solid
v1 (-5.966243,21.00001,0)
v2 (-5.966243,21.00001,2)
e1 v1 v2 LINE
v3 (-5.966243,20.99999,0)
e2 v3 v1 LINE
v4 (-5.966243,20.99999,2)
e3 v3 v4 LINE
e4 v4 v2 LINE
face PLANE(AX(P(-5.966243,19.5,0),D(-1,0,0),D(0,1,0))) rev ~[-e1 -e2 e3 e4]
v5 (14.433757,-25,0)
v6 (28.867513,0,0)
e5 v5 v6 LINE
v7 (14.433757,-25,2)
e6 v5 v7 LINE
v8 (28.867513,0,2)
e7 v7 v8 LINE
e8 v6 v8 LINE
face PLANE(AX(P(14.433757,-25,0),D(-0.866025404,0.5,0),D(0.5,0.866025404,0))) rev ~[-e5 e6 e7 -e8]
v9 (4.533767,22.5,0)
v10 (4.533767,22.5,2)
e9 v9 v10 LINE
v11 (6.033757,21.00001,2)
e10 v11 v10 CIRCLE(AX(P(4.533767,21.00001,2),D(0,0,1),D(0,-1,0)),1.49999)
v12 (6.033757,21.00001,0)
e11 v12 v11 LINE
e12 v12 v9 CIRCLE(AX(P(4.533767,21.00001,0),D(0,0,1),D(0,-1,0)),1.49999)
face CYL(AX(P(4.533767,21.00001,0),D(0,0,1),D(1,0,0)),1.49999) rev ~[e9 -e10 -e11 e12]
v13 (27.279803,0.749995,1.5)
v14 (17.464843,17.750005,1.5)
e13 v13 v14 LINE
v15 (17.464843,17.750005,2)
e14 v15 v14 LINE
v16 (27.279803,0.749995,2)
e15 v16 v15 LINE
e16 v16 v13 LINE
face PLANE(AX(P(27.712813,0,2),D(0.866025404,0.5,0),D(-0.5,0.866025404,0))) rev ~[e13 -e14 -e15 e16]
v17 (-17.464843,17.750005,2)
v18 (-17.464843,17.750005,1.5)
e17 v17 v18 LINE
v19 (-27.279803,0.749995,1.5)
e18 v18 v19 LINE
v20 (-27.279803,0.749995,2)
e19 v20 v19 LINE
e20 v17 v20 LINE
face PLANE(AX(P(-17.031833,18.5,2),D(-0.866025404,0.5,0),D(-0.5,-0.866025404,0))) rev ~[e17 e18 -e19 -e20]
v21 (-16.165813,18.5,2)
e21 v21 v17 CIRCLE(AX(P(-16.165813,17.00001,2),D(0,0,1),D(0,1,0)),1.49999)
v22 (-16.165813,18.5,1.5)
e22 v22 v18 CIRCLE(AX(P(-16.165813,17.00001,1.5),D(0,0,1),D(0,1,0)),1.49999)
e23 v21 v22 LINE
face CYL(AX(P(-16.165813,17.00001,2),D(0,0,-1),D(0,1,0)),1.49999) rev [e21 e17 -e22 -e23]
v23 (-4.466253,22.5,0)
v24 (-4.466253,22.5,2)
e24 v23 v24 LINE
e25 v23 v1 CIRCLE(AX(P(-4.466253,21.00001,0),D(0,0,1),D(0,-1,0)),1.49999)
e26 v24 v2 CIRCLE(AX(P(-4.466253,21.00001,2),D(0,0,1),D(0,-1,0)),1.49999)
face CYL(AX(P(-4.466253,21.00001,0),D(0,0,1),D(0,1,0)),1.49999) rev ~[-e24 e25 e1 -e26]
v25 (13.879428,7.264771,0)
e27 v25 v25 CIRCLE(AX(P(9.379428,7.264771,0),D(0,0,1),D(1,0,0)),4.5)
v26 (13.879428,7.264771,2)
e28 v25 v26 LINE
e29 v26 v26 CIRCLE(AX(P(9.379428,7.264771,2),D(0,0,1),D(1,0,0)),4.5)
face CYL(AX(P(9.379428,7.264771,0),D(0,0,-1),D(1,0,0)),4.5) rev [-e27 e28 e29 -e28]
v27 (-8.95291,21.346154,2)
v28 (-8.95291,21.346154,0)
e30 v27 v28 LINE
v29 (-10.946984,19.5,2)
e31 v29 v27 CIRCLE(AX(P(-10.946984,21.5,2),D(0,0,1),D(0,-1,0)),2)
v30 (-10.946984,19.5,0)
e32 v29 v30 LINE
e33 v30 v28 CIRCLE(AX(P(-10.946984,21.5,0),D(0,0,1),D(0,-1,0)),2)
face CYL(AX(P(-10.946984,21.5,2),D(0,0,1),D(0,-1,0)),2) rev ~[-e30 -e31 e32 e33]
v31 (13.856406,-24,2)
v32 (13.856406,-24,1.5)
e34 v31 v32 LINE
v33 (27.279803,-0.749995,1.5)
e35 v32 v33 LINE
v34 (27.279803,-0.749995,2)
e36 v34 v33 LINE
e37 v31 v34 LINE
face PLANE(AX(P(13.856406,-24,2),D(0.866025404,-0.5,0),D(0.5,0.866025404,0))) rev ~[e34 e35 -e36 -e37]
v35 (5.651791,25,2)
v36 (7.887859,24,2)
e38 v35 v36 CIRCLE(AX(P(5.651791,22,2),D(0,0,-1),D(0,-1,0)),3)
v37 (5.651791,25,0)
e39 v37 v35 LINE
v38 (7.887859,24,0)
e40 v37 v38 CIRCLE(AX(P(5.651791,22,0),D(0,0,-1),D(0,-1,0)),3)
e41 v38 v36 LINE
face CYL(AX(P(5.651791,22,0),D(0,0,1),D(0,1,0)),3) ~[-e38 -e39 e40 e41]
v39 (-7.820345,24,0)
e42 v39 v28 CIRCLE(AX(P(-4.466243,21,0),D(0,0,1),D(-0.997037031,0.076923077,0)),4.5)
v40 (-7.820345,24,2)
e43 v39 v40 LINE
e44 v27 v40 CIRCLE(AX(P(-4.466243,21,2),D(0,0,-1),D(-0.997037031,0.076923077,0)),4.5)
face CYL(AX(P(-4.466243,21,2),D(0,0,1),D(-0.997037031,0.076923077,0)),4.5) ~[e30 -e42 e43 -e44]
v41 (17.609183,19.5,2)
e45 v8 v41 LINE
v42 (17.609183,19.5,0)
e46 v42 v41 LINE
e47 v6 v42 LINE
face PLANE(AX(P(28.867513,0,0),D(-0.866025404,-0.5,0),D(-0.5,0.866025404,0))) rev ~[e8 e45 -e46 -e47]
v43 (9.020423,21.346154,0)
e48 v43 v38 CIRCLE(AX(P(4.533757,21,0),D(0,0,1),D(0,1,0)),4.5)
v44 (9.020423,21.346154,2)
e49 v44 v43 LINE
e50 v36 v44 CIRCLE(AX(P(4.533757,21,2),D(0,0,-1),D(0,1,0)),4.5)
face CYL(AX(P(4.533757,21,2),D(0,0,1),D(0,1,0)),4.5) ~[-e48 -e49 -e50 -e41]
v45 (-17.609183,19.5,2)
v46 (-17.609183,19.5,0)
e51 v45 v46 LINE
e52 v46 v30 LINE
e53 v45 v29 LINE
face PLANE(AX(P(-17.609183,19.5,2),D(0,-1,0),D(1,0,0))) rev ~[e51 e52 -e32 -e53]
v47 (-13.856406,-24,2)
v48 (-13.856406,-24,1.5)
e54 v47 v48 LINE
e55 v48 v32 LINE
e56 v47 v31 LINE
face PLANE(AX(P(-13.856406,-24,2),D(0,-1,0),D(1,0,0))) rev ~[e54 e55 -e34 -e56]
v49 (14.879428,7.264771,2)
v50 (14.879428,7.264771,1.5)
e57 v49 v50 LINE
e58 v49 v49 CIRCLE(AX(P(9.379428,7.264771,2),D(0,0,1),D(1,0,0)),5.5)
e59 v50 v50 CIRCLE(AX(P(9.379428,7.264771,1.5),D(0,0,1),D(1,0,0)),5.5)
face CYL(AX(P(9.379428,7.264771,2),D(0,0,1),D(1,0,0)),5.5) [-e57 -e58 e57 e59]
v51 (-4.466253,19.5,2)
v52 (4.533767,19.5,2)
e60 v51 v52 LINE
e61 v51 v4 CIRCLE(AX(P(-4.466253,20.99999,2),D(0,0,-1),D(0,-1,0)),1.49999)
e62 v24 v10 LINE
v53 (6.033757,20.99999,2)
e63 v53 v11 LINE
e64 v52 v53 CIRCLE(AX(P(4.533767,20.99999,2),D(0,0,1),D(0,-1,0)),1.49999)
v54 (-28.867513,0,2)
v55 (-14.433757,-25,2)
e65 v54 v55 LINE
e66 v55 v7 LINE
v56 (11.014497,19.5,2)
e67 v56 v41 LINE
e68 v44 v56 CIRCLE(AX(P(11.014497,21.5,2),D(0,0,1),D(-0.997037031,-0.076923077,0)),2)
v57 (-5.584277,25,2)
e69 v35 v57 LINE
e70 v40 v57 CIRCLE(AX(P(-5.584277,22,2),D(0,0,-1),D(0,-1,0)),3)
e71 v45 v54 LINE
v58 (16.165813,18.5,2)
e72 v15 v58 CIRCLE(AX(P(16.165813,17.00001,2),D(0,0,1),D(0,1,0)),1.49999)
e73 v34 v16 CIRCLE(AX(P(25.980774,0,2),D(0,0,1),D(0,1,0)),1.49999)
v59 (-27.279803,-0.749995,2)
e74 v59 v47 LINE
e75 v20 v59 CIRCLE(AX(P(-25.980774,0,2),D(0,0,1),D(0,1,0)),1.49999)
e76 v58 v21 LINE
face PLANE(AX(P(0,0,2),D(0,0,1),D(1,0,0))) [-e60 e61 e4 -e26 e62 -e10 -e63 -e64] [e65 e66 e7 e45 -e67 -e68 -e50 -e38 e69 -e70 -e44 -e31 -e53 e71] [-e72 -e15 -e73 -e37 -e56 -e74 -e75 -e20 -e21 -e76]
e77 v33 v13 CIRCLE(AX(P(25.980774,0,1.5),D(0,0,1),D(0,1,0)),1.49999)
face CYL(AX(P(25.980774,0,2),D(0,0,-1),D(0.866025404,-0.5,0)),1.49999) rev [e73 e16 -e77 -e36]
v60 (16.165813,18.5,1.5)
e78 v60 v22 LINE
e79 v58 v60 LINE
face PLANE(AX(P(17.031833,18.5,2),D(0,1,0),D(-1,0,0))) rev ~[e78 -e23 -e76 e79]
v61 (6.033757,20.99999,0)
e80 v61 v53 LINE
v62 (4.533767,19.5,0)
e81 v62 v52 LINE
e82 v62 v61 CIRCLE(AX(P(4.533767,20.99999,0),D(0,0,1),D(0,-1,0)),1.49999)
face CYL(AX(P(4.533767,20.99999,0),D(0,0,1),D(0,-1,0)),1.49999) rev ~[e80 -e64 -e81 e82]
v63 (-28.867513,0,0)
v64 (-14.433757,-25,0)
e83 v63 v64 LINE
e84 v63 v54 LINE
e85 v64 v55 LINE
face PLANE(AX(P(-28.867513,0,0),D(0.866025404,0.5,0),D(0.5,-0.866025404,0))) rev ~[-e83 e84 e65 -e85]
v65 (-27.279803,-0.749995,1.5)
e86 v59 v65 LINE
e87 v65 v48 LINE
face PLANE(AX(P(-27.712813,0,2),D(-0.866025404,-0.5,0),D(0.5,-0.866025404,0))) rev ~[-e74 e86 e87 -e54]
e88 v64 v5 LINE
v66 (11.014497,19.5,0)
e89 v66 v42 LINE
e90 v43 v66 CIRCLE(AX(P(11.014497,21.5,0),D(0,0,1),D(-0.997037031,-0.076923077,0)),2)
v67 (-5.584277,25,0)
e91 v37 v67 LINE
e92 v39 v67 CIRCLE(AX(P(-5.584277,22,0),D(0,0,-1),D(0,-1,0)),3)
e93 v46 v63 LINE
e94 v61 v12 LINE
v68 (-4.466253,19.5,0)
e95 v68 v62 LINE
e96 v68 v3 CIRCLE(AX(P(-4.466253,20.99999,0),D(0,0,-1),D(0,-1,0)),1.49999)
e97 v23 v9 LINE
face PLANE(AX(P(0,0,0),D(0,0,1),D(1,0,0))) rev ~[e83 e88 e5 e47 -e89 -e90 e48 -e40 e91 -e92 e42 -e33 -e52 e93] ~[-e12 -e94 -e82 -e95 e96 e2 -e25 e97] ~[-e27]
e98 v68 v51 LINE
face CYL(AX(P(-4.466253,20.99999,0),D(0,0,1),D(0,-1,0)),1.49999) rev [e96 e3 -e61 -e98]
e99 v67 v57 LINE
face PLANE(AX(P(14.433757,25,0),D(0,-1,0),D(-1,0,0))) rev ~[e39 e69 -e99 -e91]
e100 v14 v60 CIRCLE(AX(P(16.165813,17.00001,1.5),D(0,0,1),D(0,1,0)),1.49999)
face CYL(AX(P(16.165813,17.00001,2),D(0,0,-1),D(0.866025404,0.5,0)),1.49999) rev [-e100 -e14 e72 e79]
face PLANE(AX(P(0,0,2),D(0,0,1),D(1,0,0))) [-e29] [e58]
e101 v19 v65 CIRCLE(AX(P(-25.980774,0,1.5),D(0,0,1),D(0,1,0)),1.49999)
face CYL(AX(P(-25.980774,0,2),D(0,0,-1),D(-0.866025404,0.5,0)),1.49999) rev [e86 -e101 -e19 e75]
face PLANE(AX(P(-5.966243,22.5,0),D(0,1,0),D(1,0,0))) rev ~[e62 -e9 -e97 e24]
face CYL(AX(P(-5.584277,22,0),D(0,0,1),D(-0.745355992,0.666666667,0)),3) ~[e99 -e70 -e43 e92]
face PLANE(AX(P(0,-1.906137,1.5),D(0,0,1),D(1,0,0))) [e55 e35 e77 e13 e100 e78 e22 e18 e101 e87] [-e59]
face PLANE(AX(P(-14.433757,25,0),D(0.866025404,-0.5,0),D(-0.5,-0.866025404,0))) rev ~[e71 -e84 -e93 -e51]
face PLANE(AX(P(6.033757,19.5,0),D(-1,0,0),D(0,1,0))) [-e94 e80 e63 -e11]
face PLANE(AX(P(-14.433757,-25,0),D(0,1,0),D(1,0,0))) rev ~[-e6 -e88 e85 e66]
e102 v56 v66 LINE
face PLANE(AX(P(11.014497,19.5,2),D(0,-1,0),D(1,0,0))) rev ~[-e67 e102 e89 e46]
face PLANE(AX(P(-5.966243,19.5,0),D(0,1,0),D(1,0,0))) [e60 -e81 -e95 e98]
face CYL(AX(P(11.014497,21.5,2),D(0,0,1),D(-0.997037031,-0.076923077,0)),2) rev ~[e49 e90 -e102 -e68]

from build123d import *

# Parameters (mm, degrees)
F0_R     = 4.5
F0_W     = 12
F0_H     = 3
F1_DEPTH = 2
F2_R     = 5.5
F3_DEPTH = 0.5
F5_R     = 1.49999
F7_DEPTH = 25
F8_R     = 3


# Not quite as in the source:
# - a fillet or chamfer is up to 0.001 mm smaller than in the source, because OpenCascade refuses the exact size


with BuildPart() as f1:
    # F0 (on Top) → F1 (new body)
    with BuildSketch(Plane.XY):
        Polygon((14.4337567297, -25), (28.8675134595, 0), (14.4337567297, 25), (-14.4337567297, 25), (-28.8675134595, 0), (-14.4337567297, -25), align=None)
        with Locations((9.37942788, 7.2647714987)):
            Circle(F0_R, mode=Mode.SUBTRACT)
        with Locations((0.0337567297, 21)):
            Rectangle(F0_W, F0_H, mode=Mode.SUBTRACT)
    extrude(amount=F1_DEPTH)

    # F2 (on face) → F3 (cut)
    with BuildSketch(Plane.XY.offset(2)):
        Polygon((-13.8564064606, -24), (13.8564064606, -24), (27.7128129211, 0), (17.0318329411, 18.5), (-17.0318329411, 18.5), (-27.7128129211, 0), align=None)
        with Locations((9.37942788, 7.2647714987)):
            Circle(F2_R, mode=Mode.SUBTRACT)
    extrude(amount=-F3_DEPTH, mode=Mode.SUBTRACT)

    # F5 (radius 1.5 in the source; OpenCascade refuses exactly that, so slightly less here)
    f5_edges = [f1.edges().sort_by_distance(p)[0] for p in [
        (-5.966243, 19.5, 1),
        (6.033757, 19.5, 1),
        (6.033757, 22.5, 1),
        (-5.966243, 22.5, 1),
        (-17.031833, 18.5, 1.75),
        (-27.712813, 0, 1.75),
        (17.031833, 18.5, 1.75),
        (27.712813, 0, 1.75),
    ]]
    fillet(f5_edges, radius=F5_R)

    # F6 (on face) → F7 (cut)
    with BuildSketch(Plane.XY.offset(2)):
        with BuildLine():
            Line((-4.4662432703, 25.5), (4.5337567297, 25.5))
            ThreePointArc((4.5337567297, 25.5), (7.5909047219, 24.3020972357), (9.0204233671, 21.3461538462))
            ThreePointArc((9.0204233671, 21.3461538462), (9.6557649872, 20.0324012286), (11.0144974281, 19.5))
            Line((11.0144974281, 19.5), (21.36195996, 19.5))
            Line((21.36195996, 19.5), (25.703800239, 29.2692627907))
            Line((25.703800239, 29.2692627907), (-20.3538952839, 30.2788760662))
            Line((-20.3538952839, 30.2788760662), (-17.6091832103, 19.5))
            Line((-17.6091832103, 19.5), (-10.9469839687, 19.5))
            ThreePointArc((-10.9469839687, 19.5), (-9.5882515277, 20.0324012286), (-8.9529099076, 21.3461538462))
            ThreePointArc((-8.9529099076, 21.3461538462), (-7.5233912624, 24.3020972357), (-4.4662432703, 25.5))
        make_face()
    extrude(amount=-F7_DEPTH, mode=Mode.SUBTRACT)

    # F8
    f8_edges = [f1.edges().sort_by_distance(p)[0] for p in [
        (-6.527796, 25, 1),
        (6.59531, 25, 1),
    ]]
    fillet(f8_edges, radius=F8_R)


solid = f1.part
